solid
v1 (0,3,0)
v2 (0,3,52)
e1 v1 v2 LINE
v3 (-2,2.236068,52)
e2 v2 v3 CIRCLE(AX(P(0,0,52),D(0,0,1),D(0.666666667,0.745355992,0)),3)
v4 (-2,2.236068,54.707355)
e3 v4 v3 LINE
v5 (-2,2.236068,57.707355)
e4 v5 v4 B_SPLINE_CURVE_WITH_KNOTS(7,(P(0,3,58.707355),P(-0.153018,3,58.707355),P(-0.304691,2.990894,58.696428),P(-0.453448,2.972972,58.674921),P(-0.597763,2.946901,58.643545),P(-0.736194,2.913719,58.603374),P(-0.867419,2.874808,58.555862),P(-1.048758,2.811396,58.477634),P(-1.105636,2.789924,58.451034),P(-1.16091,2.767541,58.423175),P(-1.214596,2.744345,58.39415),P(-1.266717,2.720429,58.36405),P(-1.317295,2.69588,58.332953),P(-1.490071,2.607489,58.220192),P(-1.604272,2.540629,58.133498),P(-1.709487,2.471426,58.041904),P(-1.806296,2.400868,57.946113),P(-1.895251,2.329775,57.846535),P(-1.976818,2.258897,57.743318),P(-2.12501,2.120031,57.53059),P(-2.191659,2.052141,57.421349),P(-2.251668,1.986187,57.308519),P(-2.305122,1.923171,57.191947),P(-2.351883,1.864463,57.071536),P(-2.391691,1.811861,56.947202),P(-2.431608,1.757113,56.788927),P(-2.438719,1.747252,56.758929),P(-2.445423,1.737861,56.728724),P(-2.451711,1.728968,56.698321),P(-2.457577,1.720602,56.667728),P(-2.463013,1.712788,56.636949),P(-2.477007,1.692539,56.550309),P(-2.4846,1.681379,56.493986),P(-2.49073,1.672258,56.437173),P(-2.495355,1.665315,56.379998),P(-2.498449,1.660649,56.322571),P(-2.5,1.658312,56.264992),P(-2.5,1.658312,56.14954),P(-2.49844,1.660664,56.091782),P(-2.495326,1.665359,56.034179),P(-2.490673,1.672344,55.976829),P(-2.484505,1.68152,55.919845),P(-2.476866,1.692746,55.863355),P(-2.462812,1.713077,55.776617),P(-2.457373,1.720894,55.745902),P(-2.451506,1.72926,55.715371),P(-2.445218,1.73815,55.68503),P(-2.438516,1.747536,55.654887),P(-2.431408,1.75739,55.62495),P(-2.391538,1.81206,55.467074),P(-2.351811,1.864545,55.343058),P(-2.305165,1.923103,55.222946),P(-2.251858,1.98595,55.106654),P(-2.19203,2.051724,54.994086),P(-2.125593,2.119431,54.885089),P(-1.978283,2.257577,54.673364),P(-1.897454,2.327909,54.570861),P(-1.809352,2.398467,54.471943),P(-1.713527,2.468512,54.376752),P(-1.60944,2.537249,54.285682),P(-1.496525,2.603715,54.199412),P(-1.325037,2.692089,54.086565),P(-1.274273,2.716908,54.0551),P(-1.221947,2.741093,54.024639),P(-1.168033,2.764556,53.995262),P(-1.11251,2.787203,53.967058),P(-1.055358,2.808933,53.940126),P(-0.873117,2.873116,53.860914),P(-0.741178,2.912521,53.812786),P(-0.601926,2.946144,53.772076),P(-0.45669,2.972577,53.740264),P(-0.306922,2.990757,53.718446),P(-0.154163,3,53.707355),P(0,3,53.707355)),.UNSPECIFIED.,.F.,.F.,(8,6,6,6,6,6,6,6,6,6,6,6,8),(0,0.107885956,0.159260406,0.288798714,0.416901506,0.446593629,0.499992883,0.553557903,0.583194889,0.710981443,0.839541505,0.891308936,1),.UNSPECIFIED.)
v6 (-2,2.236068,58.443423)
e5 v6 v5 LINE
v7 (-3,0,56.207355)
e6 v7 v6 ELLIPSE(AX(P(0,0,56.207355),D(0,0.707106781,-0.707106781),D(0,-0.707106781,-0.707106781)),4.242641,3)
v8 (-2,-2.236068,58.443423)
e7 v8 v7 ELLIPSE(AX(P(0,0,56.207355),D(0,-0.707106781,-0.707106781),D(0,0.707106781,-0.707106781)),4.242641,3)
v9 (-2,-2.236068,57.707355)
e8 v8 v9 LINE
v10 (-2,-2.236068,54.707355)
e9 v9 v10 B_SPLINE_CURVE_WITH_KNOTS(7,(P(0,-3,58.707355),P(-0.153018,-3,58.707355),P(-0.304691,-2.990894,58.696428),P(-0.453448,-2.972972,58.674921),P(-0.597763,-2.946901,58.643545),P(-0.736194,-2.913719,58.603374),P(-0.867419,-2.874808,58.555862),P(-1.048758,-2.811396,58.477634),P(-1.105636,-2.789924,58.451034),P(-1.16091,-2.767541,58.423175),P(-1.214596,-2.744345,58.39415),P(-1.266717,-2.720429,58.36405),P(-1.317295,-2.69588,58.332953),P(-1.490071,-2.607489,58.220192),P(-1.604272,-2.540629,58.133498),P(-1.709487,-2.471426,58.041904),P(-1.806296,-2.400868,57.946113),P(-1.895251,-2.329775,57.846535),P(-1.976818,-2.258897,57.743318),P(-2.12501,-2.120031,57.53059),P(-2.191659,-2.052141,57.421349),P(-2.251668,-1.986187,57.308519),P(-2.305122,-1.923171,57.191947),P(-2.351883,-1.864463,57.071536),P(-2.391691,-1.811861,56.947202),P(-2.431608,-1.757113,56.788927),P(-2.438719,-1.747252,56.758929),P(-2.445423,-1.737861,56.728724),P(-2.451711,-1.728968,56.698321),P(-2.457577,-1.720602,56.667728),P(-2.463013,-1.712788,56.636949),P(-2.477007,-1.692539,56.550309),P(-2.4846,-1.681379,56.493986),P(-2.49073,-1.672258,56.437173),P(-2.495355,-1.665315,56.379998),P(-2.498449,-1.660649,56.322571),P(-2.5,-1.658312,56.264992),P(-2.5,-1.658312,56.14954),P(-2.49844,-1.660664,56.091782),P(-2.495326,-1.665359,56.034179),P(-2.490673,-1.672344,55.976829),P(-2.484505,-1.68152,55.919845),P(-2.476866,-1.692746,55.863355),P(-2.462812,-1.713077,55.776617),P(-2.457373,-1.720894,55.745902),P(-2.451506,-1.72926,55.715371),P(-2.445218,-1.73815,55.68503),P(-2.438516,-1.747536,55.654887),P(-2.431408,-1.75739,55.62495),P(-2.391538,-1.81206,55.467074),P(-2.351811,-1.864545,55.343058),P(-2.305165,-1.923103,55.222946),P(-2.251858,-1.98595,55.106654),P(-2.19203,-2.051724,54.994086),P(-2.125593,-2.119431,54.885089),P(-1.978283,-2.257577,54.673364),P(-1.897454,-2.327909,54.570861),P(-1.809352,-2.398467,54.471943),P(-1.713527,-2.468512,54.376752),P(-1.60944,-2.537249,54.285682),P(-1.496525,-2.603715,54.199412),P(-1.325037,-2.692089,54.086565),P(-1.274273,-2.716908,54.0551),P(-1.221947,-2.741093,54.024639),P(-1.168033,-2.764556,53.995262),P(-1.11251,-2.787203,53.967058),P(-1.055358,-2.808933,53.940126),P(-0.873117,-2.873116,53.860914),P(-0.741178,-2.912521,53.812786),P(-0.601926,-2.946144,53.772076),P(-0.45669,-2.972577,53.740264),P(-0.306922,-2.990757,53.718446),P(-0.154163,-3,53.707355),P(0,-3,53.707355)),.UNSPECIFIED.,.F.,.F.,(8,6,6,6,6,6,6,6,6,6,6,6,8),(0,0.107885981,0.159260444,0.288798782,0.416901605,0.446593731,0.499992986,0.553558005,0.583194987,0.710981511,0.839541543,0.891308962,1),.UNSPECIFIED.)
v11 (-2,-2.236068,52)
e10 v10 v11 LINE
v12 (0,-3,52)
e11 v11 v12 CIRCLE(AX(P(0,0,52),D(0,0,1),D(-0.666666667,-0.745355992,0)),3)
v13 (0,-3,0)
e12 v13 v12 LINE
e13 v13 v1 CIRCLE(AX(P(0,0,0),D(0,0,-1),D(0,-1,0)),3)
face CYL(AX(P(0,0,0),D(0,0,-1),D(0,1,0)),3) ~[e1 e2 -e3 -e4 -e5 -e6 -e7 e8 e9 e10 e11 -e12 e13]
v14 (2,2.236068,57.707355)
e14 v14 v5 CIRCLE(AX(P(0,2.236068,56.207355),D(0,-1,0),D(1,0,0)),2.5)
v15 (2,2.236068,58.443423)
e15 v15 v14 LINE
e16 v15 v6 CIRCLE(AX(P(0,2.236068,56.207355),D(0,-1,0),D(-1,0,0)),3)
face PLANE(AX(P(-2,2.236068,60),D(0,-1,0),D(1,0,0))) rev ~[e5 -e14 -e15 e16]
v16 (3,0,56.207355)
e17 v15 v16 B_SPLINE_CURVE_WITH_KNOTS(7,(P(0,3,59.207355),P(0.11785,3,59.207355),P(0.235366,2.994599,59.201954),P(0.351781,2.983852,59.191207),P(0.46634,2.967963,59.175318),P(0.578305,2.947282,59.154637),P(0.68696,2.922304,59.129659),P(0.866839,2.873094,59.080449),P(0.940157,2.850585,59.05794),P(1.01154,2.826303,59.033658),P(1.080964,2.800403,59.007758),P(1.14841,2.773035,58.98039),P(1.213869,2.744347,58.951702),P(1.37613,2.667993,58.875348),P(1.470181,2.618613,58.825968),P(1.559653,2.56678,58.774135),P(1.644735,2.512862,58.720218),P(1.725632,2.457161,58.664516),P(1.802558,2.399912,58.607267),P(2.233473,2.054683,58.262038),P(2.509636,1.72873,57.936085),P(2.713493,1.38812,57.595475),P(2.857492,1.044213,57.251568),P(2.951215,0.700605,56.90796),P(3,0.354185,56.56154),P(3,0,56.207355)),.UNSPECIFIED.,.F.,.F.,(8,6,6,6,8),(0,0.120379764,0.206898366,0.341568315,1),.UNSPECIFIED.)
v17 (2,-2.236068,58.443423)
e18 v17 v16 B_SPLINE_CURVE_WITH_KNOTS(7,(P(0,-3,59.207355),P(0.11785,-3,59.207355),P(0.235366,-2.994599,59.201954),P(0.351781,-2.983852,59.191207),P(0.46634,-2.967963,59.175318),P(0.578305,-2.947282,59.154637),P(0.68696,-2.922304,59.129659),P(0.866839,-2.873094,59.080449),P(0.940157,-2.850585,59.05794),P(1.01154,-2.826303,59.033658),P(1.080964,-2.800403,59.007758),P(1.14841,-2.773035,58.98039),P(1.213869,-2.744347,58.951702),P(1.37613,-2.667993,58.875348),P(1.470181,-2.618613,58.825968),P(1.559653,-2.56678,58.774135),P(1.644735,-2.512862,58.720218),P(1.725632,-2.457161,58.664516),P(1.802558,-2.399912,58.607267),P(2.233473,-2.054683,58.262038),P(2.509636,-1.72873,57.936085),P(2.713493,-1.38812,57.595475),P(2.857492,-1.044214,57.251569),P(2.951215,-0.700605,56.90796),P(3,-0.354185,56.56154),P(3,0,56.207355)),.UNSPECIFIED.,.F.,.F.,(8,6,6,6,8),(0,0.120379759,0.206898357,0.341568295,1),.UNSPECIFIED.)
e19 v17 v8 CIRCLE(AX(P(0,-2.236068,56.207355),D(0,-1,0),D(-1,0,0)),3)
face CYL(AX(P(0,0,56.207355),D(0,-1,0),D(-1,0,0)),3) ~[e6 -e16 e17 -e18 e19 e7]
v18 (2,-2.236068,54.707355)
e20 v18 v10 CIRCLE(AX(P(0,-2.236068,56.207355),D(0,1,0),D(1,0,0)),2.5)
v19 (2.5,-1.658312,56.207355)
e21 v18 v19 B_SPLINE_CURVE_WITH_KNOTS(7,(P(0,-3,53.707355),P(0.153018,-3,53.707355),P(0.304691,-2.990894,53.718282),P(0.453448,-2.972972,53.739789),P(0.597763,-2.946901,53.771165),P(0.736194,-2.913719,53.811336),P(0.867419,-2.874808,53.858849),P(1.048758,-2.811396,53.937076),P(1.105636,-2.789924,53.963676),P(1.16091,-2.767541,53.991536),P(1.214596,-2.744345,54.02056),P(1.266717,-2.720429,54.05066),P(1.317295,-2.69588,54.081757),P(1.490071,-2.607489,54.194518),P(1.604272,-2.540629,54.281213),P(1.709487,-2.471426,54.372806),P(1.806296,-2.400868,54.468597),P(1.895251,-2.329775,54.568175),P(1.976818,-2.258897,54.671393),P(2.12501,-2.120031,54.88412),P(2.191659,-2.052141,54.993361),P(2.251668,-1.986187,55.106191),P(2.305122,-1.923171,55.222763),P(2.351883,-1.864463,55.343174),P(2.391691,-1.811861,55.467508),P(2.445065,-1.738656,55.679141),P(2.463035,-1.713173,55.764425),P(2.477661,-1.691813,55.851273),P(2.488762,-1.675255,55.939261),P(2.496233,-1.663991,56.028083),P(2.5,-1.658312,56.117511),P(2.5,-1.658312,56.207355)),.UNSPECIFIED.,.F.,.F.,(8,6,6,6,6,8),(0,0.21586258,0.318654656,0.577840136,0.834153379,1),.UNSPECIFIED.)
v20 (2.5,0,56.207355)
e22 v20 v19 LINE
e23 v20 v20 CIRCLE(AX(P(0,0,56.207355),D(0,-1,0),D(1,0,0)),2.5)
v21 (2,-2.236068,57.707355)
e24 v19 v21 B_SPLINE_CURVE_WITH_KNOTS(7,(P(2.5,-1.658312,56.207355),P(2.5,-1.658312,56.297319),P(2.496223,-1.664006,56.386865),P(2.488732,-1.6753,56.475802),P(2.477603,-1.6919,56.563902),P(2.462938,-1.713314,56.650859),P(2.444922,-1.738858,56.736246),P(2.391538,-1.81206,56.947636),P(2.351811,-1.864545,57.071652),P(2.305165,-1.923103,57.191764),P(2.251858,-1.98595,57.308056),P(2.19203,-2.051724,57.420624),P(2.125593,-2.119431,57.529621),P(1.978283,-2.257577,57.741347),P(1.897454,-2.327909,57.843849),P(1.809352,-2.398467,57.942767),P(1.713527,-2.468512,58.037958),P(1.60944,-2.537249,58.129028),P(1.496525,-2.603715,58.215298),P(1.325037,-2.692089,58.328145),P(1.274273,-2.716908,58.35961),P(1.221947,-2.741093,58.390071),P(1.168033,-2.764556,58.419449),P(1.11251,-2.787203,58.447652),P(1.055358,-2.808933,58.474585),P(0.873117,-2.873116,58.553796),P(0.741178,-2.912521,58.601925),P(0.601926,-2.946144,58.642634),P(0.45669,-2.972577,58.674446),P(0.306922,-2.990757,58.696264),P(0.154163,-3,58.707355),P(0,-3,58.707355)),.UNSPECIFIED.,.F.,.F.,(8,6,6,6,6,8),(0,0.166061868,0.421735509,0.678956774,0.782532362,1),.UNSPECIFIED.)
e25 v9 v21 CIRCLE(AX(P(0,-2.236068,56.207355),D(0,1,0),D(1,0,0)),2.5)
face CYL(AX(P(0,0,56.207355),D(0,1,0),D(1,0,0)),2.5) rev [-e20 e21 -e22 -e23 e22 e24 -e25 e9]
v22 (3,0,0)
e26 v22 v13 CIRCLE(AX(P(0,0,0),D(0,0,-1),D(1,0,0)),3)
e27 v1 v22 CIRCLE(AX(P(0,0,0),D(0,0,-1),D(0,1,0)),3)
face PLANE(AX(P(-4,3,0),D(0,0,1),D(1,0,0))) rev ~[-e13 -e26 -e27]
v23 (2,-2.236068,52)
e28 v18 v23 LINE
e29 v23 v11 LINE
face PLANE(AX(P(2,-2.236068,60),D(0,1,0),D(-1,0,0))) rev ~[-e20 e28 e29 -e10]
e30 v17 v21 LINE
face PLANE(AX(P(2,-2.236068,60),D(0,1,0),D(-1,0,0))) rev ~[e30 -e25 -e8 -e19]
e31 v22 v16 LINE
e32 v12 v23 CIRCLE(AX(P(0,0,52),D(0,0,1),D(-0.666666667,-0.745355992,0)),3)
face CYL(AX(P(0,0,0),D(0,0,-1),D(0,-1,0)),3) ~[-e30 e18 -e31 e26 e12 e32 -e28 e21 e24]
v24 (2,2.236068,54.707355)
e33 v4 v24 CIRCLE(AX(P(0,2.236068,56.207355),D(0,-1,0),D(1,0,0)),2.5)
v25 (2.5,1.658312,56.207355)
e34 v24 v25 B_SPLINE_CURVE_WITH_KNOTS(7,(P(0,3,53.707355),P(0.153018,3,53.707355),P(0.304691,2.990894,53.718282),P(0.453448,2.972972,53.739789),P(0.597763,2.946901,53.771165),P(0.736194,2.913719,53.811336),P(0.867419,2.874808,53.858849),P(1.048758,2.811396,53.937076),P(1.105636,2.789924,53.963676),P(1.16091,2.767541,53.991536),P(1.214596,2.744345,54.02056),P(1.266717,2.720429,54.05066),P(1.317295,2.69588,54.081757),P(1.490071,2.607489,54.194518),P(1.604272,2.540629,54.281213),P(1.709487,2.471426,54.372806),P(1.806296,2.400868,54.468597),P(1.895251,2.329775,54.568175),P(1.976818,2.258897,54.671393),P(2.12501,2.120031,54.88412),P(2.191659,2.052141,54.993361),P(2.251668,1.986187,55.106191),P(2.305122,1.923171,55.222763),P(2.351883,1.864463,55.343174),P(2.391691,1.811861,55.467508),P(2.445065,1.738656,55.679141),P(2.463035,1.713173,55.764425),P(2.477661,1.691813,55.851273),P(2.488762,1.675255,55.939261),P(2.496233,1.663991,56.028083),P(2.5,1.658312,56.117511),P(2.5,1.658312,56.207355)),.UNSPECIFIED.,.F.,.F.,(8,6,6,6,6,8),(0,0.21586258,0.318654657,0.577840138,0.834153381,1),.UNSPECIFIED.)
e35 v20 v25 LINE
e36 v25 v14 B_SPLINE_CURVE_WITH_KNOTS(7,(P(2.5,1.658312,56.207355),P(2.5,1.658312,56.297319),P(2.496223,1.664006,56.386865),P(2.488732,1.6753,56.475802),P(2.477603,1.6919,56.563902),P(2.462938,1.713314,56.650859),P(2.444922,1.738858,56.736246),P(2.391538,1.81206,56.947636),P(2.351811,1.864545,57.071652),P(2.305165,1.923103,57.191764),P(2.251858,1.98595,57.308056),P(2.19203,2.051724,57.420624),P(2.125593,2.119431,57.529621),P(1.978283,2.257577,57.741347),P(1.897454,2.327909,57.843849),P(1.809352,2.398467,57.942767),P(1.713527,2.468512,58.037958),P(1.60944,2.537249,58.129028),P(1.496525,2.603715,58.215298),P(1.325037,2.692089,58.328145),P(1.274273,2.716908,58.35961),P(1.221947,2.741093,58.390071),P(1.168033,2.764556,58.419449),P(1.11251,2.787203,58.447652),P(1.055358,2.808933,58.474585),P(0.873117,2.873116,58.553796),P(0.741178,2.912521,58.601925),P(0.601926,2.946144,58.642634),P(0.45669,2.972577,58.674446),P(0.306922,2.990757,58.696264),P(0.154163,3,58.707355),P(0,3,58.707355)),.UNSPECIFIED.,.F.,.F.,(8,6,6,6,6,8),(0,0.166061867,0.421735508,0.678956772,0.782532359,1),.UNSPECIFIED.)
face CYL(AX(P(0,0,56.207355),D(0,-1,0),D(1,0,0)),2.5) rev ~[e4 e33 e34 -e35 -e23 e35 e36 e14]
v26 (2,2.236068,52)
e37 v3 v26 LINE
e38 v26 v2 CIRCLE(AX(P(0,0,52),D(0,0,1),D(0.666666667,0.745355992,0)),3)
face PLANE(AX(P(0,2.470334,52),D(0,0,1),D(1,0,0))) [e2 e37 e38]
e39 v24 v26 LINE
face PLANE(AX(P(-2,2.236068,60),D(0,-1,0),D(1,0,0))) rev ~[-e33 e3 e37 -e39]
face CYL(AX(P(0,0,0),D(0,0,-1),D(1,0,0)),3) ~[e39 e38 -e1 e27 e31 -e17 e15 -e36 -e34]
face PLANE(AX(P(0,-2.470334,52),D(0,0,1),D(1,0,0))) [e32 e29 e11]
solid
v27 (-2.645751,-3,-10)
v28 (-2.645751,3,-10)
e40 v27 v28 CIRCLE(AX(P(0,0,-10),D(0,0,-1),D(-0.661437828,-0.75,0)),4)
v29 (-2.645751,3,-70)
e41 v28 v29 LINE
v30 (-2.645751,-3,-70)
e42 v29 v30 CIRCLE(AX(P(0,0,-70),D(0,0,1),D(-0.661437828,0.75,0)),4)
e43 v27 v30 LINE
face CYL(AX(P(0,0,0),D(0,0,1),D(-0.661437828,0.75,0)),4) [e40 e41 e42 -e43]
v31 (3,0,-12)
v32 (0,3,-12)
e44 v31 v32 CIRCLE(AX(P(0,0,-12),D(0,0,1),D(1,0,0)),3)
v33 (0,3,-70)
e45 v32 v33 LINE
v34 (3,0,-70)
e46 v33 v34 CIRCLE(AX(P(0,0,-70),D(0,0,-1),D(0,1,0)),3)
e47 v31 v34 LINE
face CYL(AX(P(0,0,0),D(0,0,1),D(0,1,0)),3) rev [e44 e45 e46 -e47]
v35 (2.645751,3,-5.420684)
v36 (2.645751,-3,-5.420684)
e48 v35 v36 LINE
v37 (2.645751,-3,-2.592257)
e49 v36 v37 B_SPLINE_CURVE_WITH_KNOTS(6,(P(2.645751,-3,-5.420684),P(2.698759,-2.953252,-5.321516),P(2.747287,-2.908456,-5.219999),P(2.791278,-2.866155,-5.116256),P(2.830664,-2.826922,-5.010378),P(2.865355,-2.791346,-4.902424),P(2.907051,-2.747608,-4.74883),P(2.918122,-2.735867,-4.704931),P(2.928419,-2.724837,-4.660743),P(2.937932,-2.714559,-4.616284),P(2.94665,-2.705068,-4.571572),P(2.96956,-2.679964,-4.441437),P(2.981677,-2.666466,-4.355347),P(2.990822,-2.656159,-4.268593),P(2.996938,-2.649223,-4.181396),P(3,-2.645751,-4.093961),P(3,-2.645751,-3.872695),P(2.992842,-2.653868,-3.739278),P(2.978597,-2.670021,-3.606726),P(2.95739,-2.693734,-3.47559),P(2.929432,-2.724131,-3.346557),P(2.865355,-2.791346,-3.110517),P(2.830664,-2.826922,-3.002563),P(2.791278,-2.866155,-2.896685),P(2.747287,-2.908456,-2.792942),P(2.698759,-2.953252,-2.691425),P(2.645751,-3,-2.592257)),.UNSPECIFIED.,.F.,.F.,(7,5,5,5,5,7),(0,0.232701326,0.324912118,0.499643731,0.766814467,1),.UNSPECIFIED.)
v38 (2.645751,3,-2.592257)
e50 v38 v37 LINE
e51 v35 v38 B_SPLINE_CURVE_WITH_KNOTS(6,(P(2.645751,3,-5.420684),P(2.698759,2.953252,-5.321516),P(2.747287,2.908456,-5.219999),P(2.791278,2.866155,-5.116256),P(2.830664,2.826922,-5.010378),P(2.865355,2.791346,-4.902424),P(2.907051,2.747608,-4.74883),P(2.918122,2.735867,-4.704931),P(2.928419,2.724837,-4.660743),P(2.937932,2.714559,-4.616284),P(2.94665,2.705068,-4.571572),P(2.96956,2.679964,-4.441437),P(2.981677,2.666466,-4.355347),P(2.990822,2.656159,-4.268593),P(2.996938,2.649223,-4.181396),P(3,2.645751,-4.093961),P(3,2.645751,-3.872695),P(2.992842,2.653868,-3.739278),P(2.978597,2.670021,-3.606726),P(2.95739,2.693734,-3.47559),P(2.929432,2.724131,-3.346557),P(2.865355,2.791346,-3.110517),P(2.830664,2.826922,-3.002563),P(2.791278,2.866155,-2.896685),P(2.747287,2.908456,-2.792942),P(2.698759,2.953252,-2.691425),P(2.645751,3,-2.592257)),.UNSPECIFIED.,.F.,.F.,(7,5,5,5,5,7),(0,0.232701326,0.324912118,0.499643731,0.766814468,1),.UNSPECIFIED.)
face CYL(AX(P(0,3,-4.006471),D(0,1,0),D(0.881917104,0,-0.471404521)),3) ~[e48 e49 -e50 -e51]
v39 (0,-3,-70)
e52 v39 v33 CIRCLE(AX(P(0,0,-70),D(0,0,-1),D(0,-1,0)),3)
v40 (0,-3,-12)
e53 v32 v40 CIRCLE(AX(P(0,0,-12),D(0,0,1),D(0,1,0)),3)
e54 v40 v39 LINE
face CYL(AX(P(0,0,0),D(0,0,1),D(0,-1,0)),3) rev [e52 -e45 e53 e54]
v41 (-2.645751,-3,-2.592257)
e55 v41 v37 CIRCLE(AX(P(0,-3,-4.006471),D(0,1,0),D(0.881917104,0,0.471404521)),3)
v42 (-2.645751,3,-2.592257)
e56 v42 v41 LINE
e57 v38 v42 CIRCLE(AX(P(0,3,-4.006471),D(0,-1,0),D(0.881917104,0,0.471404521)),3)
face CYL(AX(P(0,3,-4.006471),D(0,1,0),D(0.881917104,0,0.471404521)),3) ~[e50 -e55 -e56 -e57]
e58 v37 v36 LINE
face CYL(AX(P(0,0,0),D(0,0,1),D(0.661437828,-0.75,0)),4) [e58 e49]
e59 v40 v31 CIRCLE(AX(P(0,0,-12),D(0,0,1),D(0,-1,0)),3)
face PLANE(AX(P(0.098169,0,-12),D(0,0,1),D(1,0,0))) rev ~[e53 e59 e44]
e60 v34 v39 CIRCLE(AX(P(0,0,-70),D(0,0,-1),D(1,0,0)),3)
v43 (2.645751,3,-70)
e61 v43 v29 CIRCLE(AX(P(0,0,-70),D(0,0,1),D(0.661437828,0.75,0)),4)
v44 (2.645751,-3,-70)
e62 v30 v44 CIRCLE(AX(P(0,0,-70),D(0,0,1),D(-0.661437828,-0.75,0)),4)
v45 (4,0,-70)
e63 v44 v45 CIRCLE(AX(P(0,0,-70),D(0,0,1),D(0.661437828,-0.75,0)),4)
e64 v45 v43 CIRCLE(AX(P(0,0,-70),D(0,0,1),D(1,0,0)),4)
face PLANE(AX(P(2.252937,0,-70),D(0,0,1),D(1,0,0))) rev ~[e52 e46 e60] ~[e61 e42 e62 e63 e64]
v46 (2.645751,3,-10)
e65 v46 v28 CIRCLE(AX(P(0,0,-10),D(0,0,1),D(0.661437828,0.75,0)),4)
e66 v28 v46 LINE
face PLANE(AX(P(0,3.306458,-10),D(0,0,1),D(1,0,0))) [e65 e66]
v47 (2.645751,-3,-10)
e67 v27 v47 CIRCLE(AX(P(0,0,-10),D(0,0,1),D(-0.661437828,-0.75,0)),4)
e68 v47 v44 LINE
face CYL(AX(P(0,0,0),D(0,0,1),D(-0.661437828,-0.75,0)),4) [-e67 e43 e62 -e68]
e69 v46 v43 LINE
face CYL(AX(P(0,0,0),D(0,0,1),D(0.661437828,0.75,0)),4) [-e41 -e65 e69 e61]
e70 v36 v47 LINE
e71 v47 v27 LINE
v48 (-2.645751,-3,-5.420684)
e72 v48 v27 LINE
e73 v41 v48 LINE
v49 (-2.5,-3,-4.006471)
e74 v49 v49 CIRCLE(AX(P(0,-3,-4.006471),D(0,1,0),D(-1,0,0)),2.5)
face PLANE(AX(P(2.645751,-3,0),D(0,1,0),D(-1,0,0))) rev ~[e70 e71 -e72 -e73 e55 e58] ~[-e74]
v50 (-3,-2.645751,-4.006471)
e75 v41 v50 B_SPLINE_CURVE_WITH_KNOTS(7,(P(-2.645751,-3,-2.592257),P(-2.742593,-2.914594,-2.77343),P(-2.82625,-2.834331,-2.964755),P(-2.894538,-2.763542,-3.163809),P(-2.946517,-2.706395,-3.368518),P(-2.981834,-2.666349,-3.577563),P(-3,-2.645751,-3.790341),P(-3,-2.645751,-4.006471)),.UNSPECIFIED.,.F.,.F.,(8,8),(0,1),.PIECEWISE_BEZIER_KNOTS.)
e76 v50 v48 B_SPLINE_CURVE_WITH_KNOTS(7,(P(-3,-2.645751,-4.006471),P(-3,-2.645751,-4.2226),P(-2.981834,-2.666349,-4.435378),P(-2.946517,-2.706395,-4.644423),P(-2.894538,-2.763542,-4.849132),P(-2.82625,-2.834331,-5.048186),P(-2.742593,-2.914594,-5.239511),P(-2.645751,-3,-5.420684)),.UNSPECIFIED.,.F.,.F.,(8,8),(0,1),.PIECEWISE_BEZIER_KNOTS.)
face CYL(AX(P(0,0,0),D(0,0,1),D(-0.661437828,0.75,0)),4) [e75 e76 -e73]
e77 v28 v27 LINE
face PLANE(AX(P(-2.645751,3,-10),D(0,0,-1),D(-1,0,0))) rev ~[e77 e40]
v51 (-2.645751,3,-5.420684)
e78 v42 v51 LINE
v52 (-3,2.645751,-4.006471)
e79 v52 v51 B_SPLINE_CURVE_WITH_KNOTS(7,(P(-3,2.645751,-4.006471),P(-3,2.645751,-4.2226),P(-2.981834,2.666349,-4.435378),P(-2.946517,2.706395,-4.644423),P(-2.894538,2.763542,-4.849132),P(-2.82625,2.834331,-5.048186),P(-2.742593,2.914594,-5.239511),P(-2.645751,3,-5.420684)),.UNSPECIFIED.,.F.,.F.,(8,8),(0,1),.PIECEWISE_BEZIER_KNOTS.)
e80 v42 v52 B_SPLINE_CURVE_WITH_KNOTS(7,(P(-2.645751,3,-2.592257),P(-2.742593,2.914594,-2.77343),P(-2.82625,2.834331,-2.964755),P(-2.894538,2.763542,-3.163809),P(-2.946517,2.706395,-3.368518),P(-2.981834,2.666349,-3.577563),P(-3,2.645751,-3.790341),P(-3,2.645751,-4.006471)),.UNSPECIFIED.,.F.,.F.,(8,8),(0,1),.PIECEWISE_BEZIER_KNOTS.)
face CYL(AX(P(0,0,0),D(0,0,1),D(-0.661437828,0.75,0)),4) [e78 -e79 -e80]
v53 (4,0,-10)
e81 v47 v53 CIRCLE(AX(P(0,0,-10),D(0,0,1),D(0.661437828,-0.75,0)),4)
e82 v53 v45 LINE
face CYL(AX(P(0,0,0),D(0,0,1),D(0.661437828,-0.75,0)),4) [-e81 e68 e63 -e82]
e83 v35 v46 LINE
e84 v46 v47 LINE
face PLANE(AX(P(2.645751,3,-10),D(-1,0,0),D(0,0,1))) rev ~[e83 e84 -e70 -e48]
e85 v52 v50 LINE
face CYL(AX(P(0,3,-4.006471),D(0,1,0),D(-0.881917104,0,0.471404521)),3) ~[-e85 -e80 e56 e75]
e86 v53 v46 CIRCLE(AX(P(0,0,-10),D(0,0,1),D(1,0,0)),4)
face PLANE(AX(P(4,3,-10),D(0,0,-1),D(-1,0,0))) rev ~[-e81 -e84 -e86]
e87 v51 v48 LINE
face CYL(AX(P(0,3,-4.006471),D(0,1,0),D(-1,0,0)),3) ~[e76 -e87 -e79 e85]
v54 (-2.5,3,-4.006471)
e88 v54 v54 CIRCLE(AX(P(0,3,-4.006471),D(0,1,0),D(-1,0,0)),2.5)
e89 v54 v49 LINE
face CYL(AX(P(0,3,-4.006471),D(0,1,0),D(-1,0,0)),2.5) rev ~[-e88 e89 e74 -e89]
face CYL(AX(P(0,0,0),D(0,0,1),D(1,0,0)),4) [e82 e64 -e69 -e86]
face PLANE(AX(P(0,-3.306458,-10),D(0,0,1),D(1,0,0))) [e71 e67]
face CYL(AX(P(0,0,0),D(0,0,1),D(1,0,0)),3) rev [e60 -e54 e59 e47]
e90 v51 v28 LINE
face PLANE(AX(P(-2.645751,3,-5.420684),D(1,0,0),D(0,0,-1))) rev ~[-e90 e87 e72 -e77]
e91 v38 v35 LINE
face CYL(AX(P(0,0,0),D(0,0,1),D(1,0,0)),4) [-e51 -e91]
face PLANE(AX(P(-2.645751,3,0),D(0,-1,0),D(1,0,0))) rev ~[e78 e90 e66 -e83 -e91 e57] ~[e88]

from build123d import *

# Parameters (mm, degrees)
F1_DEPTH  = 70
F2_DEPTH  = 60
F3_DEPTH  = 12
F4_DEPTH  = 10
F5_R      = 2.5
F6_DEPTH  = 25
F8_DEPTH  = 8
F9_R      = 2.5
F10_DEPTH = 12.5


with BuildPart() as f1:
    # F0 (on Top) → F1 (new body)
    with BuildSketch(Plane.XY):
        with BuildLine():
            ThreePointArc((2.6457513111, -3), (3.6457513111, -1.6457513111), (4, 0))
            ThreePointArc((4, 0), (3.6457513111, 1.6457513111), (2.6457513111, 3))
            Line((2.6457513111, 3), (0, 3))
            ThreePointArc((0, 3), (2.1213203436, 2.1213203436), (3, 0))
            ThreePointArc((3, 0), (2.1213203436, -2.1213203436), (0, -3))
            Line((0, -3), (2.6457513111, -3))
        make_face()
        with BuildLine():
            Line((0, 3), (2.6457513111, 3))
            ThreePointArc((2.6457513111, 3), (0, 4), (-2.6457513111, 3))
            Line((-2.6457513111, 3), (0, 3))
        make_face()
        with BuildLine():
            ThreePointArc((-2.6457513111, -3), (0, -4), (2.6457513111, -3))
            Line((2.6457513111, -3), (0, -3))
            Line((0, -3), (-2.6457513111, -3))
        make_face()
        with BuildLine():
            Line((0, 3), (-2.6457513111, 3))
            ThreePointArc((-2.6457513111, 3), (-4, 0), (-2.6457513111, -3))
            Line((-2.6457513111, -3), (0, -3))
            ThreePointArc((0, -3), (-3, 0), (0, 3))
        make_face()
    extrude(amount=-F1_DEPTH)



with BuildPart() as f2:
    # F0 (on Top) → F2 (new body)
    with BuildSketch(Plane.XY):
        with BuildLine():
            ThreePointArc((3, 0), (2.1213203436, 2.1213203436), (0, 3))
            ThreePointArc((0, 3), (-3, 0), (0, -3))
            ThreePointArc((0, -3), (2.1213203436, -2.1213203436), (3, 0))
        make_face()
    extrude(amount=F2_DEPTH)


with BuildPart() as f1_1:
    add(f1.part)

    add(f2.part)  # F3 merges F2
    # F0 (on Top) → F3 (join)
    with BuildSketch(Plane.XY):
        with BuildLine():
            ThreePointArc((3, 0), (2.1213203436, 2.1213203436), (0, 3))
            ThreePointArc((0, 3), (-3, 0), (0, -3))
            ThreePointArc((0, -3), (2.1213203436, -2.1213203436), (3, 0))
        make_face()
    extrude(amount=-F3_DEPTH)

    # F0 (on Top) → F4 (cut)
    with BuildSketch(Plane.XY):
        with BuildLine():
            Line((0, 3), (2.6457513111, 3))
            ThreePointArc((2.6457513111, 3), (0, 4), (-2.6457513111, 3))
            Line((-2.6457513111, 3), (0, 3))
        make_face()
        with BuildLine():
            ThreePointArc((-2.6457513111, -3), (0, -4), (2.6457513111, -3))
            Line((2.6457513111, -3), (0, -3))
            Line((0, -3), (-2.6457513111, -3))
        make_face()
    extrude(amount=-F4_DEPTH, mode=Mode.SUBTRACT)

    # F5 (on face) → F6 (cut)
    with BuildSketch(Plane(origin=(0, 3, 0), x_dir=(-1, 0, 0), z_dir=(0, 1, 0))):
        with Locations((0, -4.0064705536)):
            Circle(F5_R)
        with BuildLine():
            ThreePointArc((-2.6457513111, -5.420684116), (-3, -4.0064705536), (-2.6457513111, -2.5922569912))
            Line((-2.6457513111, -2.5922569912), (-2.6457513111, 0))
            Line((-2.6457513111, 0), (-4, 0))
            Line((-4, 0), (-4, -10))
            Line((-4, -10), (-2.6457513111, -10))
            Line((-2.6457513111, -10), (-2.6457513111, -5.420684116))
        make_face()
        with BuildLine():
            ThreePointArc((2.6457513111, -2.5922569912), (2.9100905427, -3.2775171714), (3, -4.0064705536))
            ThreePointArc((3, -4.0064705536), (2.9100905427, -4.7354239358), (2.6457513111, -5.420684116))
            Line((2.6457513111, -5.420684116), (2.6457513111, -10))
            Line((2.6457513111, -10), (4, -10))
            Line((4, -10), (4, 0))
            Line((4, 0), (2.6457513111, 0))
            Line((2.6457513111, 0), (2.6457513111, -2.5922569912))
        make_face()
        with BuildLine():
            ThreePointArc((-2.6457513111, -2.5922569912), (0, -1.0064705536), (2.6457513111, -2.5922569912))
            Line((2.6457513111, -2.5922569912), (2.6457513111, 0))
            Line((2.6457513111, 0), (1.3542486889, 0))
            Line((1.3542486889, 0), (0, 0))
            Line((0, 0), (-1.3542486889, 0))
            Line((-1.3542486889, 0), (-2.6457513111, 0))
            Line((-2.6457513111, 0), (-2.6457513111, -2.5922569912))
        make_face()
    extrude(amount=-F6_DEPTH, mode=Mode.SUBTRACT)

    # F7 (on face) → F8 (cut)
    with BuildSketch(Plane.XY.offset(60)):
        with BuildLine():
            ThreePointArc((2, 2.2360679775), (0, 3), (-2, 2.2360679775))
            Line((-2, 2.2360679775), (2, 2.2360679775))
        make_face()
        with BuildLine():
            ThreePointArc((-2, -2.2360679775), (0, -3), (2, -2.2360679775))
            Line((2, -2.2360679775), (-2, -2.2360679775))
        make_face()
    extrude(amount=-F8_DEPTH, mode=Mode.SUBTRACT)

    # F9 (on Front) → F10 (cut, symmetric)
    with BuildSketch(Plane.XZ):
        with Locations((0, 56.2073551118)):
            Circle(F9_R)
        with BuildLine():
            Line((-3, 60), (-3, 56.2073551118))
            ThreePointArc((-3, 56.2073551118), (0, 59.2073551118), (3, 56.2073551118))
            Line((3, 56.2073551118), (3, 60))
            Line((3, 60), (-3, 60))
        make_face()
    extrude(amount=F10_DEPTH, both=True, mode=Mode.SUBTRACT)


solid = f1_1.part
